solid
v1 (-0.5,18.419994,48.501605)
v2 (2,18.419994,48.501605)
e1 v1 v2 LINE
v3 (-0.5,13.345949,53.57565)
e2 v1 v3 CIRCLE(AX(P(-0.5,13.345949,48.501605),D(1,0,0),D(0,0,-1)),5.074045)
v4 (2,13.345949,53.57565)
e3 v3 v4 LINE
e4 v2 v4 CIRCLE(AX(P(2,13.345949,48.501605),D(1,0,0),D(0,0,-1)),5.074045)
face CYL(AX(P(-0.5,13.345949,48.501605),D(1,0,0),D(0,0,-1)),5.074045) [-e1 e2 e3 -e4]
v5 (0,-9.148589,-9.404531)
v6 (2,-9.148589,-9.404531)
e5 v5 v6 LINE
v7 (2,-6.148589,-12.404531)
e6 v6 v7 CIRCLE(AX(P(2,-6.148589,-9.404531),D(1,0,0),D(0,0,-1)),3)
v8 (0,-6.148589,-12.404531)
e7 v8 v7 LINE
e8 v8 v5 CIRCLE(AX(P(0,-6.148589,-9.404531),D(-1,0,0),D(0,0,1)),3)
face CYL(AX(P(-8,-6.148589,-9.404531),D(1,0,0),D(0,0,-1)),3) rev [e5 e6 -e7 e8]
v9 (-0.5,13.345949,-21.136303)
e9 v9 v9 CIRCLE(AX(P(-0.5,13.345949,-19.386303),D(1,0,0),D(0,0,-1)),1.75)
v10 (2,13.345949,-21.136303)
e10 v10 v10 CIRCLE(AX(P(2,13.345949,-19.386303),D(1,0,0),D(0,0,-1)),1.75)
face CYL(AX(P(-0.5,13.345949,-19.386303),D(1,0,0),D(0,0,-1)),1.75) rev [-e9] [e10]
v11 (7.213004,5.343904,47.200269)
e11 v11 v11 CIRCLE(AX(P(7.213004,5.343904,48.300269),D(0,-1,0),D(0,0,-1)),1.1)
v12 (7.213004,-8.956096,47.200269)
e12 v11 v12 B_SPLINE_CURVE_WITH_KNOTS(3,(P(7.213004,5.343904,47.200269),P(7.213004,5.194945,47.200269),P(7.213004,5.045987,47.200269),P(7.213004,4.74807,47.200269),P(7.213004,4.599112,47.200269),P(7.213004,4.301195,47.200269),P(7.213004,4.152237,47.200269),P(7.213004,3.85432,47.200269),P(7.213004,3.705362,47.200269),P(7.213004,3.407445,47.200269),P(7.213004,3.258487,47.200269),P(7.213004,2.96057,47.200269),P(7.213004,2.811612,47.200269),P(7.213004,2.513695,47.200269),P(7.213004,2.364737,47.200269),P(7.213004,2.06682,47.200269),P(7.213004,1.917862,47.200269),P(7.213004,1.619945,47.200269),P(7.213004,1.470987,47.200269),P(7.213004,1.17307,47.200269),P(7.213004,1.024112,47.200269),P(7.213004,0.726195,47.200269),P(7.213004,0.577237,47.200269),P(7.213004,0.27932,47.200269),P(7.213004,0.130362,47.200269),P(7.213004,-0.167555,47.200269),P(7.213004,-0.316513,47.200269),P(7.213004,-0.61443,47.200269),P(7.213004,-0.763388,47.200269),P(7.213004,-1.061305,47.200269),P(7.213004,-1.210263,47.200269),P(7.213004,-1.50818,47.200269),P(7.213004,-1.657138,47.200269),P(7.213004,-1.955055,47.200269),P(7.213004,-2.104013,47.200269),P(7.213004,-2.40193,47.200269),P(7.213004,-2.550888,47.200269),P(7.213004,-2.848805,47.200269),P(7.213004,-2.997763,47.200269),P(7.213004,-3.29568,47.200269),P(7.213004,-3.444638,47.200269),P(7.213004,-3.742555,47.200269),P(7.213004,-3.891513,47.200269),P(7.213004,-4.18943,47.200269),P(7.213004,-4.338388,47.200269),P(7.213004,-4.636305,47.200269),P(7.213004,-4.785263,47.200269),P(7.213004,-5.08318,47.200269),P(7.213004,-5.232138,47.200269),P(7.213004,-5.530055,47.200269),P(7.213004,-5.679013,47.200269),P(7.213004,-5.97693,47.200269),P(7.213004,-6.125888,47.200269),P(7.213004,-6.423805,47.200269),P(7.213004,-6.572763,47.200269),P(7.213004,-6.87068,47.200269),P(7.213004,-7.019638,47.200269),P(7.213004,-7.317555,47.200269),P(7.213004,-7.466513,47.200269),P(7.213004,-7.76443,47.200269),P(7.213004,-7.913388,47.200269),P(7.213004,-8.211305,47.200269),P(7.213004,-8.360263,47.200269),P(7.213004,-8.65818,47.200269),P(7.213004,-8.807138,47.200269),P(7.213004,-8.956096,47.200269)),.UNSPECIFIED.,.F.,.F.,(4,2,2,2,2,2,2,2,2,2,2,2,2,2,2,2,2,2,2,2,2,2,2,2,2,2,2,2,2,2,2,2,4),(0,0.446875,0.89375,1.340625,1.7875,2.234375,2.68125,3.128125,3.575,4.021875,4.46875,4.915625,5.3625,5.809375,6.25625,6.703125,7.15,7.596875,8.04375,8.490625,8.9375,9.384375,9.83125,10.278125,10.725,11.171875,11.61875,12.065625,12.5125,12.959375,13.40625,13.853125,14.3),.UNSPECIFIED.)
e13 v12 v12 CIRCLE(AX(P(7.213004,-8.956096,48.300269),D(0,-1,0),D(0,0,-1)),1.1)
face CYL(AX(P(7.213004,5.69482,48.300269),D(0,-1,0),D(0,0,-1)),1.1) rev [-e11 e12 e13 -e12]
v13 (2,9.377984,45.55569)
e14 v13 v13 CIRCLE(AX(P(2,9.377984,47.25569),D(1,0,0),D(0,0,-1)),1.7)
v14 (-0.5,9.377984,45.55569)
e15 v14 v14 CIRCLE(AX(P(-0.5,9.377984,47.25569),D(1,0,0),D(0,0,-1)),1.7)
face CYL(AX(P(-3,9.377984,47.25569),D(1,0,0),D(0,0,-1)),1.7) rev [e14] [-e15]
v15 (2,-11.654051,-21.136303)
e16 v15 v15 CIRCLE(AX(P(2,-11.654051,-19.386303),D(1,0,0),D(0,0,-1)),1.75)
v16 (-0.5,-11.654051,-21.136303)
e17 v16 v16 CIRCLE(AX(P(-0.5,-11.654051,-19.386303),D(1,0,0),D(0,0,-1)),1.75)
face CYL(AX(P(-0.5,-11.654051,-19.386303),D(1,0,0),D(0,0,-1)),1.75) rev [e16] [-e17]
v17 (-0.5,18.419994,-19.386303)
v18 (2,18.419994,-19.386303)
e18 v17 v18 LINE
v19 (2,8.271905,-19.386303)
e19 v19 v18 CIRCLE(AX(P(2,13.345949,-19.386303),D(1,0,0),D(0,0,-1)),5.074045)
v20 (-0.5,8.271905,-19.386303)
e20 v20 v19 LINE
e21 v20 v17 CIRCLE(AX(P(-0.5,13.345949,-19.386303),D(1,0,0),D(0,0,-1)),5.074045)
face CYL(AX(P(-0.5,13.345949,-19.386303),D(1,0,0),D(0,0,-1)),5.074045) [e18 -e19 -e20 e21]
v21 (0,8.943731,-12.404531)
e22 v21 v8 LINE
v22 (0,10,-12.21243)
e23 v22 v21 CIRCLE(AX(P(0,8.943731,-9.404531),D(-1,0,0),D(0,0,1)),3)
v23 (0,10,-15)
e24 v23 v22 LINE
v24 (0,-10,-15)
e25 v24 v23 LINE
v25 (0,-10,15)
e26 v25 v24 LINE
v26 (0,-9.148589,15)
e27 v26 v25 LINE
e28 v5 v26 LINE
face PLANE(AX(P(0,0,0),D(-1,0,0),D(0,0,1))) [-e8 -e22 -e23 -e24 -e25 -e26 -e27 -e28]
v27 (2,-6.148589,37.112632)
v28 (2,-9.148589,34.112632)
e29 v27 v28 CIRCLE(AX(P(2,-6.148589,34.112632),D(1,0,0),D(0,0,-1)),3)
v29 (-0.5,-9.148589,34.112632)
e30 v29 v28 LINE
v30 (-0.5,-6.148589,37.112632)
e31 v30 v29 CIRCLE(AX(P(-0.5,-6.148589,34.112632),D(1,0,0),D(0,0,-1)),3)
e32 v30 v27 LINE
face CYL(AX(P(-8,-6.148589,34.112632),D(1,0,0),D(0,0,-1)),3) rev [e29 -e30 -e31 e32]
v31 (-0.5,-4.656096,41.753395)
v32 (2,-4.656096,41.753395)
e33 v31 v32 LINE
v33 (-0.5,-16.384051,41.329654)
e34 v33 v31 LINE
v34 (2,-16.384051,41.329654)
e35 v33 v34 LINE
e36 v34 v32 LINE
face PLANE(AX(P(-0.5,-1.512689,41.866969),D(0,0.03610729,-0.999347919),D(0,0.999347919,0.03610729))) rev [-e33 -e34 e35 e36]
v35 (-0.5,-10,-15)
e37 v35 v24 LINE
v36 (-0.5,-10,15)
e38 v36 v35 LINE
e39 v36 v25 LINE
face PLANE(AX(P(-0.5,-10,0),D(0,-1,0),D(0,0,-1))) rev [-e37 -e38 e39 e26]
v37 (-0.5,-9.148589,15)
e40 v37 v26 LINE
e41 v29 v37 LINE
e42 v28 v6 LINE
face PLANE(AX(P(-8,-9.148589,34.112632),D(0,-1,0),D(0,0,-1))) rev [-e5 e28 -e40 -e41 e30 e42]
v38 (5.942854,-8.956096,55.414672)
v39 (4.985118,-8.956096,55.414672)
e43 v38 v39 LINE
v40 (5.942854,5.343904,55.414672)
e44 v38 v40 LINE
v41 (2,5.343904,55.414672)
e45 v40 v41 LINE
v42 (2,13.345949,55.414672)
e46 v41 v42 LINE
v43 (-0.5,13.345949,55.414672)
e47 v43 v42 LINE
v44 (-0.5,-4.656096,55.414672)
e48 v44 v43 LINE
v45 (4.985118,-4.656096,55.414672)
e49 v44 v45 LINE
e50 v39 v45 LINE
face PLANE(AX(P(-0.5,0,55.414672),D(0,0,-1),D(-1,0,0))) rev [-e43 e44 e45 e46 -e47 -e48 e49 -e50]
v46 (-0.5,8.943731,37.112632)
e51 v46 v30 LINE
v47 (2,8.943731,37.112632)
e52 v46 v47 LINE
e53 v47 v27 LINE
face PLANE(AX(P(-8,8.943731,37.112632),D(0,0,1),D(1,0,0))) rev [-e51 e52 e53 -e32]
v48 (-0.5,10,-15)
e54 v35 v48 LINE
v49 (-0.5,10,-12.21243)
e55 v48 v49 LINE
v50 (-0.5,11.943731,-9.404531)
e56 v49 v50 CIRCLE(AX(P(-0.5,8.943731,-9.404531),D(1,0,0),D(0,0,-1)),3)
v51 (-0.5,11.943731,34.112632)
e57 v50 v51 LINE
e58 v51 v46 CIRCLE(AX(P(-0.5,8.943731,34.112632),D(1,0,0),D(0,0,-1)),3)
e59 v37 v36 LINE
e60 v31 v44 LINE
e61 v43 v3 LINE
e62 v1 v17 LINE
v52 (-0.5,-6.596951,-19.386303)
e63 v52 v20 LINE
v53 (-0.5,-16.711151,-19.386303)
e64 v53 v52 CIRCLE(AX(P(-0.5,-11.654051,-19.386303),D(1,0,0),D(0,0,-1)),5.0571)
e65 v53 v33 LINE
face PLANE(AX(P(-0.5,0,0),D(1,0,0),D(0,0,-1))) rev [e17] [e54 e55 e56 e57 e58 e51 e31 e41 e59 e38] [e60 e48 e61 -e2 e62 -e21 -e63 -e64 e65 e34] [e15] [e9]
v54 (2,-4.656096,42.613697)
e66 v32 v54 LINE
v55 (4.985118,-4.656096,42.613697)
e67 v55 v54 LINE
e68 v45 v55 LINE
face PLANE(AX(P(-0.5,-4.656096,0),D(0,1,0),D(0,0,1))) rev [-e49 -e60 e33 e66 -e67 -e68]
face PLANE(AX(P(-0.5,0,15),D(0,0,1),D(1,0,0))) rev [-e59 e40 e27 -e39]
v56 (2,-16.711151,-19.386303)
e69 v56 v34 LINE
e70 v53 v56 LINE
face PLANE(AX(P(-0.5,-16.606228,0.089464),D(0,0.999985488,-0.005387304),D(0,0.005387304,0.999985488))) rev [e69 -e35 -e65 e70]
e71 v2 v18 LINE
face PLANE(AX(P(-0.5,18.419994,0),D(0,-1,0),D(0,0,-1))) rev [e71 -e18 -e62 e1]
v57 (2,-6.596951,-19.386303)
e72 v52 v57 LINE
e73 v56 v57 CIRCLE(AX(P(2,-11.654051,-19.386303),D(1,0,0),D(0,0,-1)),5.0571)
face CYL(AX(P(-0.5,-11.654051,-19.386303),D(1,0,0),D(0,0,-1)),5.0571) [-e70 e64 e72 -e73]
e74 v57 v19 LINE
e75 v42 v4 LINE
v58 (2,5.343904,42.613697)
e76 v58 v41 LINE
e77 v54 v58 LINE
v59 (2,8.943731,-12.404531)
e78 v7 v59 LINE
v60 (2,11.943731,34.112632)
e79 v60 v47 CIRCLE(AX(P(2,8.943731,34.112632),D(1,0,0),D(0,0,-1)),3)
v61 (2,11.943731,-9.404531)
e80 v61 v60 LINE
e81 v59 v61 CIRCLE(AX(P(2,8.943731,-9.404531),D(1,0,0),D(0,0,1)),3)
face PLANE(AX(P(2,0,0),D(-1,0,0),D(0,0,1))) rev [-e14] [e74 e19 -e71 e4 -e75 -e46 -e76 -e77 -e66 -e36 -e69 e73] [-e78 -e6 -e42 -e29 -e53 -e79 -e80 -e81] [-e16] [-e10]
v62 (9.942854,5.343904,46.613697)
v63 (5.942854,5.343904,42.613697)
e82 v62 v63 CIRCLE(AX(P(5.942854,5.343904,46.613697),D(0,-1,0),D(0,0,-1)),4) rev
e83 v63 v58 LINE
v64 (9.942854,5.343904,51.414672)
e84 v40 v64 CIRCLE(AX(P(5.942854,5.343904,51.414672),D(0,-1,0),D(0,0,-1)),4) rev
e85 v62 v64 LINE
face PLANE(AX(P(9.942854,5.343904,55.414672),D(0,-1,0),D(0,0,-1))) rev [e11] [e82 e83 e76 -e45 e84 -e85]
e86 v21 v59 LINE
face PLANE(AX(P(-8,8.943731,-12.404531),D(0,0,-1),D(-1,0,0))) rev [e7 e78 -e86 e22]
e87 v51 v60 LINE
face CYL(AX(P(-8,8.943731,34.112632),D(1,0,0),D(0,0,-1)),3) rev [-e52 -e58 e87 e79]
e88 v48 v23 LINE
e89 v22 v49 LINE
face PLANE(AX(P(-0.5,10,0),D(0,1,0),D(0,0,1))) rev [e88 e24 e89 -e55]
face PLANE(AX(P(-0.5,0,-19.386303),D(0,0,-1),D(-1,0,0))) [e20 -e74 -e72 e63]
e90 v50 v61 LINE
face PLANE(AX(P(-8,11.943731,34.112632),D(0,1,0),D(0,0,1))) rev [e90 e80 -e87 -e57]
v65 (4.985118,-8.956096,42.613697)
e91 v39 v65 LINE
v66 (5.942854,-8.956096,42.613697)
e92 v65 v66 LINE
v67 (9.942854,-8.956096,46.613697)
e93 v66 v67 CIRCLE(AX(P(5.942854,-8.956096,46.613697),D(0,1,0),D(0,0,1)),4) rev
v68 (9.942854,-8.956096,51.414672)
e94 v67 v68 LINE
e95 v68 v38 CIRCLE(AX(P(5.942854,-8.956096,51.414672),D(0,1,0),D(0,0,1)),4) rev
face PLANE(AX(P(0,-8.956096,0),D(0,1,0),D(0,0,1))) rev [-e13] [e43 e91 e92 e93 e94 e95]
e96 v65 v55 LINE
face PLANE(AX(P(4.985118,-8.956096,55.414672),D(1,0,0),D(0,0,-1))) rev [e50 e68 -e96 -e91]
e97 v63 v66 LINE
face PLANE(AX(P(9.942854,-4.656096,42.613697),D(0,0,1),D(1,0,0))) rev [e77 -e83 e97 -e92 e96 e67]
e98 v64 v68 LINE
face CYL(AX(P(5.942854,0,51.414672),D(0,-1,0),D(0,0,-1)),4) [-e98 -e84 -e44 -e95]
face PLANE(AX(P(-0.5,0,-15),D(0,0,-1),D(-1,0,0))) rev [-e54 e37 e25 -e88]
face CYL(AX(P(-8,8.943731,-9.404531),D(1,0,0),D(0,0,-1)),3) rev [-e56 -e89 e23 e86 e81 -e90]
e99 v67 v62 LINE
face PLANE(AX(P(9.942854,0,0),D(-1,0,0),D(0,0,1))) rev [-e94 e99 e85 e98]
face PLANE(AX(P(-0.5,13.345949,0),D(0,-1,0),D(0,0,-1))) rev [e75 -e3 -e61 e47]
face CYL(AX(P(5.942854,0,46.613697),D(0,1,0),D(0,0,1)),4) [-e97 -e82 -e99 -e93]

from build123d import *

# Parameters (mm, degrees)
SKETCH1_W           = 30
SKETCH1_H           = 20
BOSS_EXTRUDE1_DEPTH = 2
SKETCH2_W           = 30
SKETCH2_H           = 20
SKETCH2_R           = 1.75
BOSS_EXTRUDE2_DEPTH = 2.5
SKETCH5_W           = 12.800974789
SKETCH5_H           = 10
BOSS_EXTRUDE3_DEPTH = 7.942853576
SKETCH6_R           = 1.1
CUT_EXTRUDE3_DEPTH  = 10.350916352
CUT_EXTRUDE4_DEPTH  = 10
BOSS_EXTRUDE4_START = 4.3
SKETCH8_W           = 4.957735271
SKETCH8_H           = 12.800974789
SKETCH8_R           = 1.1
BOSS_EXTRUDE4_DEPTH = 4.3
FILLET2_R           = 4
SKETCH9_R           = 1.7
CUT_EXTRUDE5_DEPTH  = 5


with BuildPart() as part:
    # Sketch1 → Boss-Extrude1 (new body)
    with BuildSketch(Plane(origin=(0, 0, 0), x_dir=(0, 0, -1), z_dir=(1, 0, 0))):
        Rectangle(SKETCH1_W, SKETCH1_H)
    extrude(amount=BOSS_EXTRUDE1_DEPTH)

    # Sketch2 → Boss-Extrude2 (add)
    with BuildSketch(Plane(origin=(2, 0, 0), x_dir=(0, 0, -1), z_dir=(1, 0, 0))):
        with BuildLine():
            Line((19.386302525, -6.596950759), (19.386302525, 8.271904581))
            ThreePointArc((19.386302525, 8.271904581), (24.460347107, 13.345949163), (19.386302525, 18.419993745))
            Line((19.386302525, 18.419993745), (-48.501605412, 18.419993745))
            ThreePointArc((-48.501605412, 18.419993745), (-52.089496744, 16.933840495), (-53.575649994, 13.345949163))
            Line((-53.575649994, 13.345949163), (-55.414672264, 13.345949163))
            Line((-55.414672264, 13.345949163), (-55.414672264, -4.656096182))
            Line((-55.414672264, -4.656096182), (-41.753395036, -4.656096182))
            Line((-41.753395036, -4.656096182), (-41.329654068, -16.384050837))
            Line((-41.329654068, -16.384050837), (19.386302525, -16.711150914))
            ThreePointArc((19.386302525, -16.711150914), (24.443402602, -11.654050837), (19.386302525, -6.596950759))
        make_face()
        Rectangle(SKETCH2_W, SKETCH2_H, mode=Mode.SUBTRACT)
        with Locations((19.386302525, -11.654050837)):
            Circle(SKETCH2_R, mode=Mode.SUBTRACT)
        with Locations((19.386302525, 13.345949163)):
            Circle(SKETCH2_R, mode=Mode.SUBTRACT)
    extrude(amount=-BOSS_EXTRUDE2_DEPTH)

    # Sketch5 → Boss-Extrude3 (add)
    with BuildSketch(Plane(origin=(2, 0, 0), x_dir=(0, 0, -1), z_dir=(1, 0, 0))):
        with Locations((-49.014184869, 0.343903818)):
            Rectangle(SKETCH5_W, SKETCH5_H)
    extrude(amount=BOSS_EXTRUDE3_DEPTH)

    # Sketch6 → Cut-Extrude3 (cut)
    with BuildSketch(Plane(origin=(4.063003727, -4.656096182, -0.641169076), x_dir=(1, 0, 0), z_dir=(0, -1, 0))):
        with Locations((3.15, 48.941437628)):
            Circle(SKETCH6_R)
    extrude(amount=-CUT_EXTRUDE3_DEPTH, mode=Mode.SUBTRACT)

    # Sketch7 → Cut-Extrude4 (cut)
    with BuildSketch(Plane(origin=(2, 0, 0), x_dir=(0, 0, -1), z_dir=(1, 0, 0))):
        with BuildLine():
            Line((-34.112632424, 11.943731273), (9.404530778, 11.943731273))
            ThreePointArc((9.404530778, 11.943731273), (11.525851122, 11.065051617), (12.404530778, 8.943731273))
            Line((12.404530778, 8.943731273), (12.404530778, -6.148588701))
            ThreePointArc((12.404530778, -6.148588701), (11.525851122, -8.269909045), (9.404530778, -9.148588701))
            Line((9.404530778, -9.148588701), (-34.112632424, -9.148588701))
            ThreePointArc((-34.112632424, -9.148588701), (-36.233952768, -8.269909045), (-37.112632424, -6.148588701))
            Line((-37.112632424, -6.148588701), (-37.112632424, 8.943731273))
            ThreePointArc((-37.112632424, 8.943731273), (-36.233952768, 11.065051617), (-34.112632424, 11.943731273))
        make_face()
    extrude(amount=-CUT_EXTRUDE4_DEPTH, mode=Mode.SUBTRACT)

    # Sketch8 → Boss-Extrude4 (add)
    with BuildSketch(Plane.XZ.offset(4.656096182).offset(BOSS_EXTRUDE4_START)):
        with Locations((7.463985941, 49.014184869)):
            Rectangle(SKETCH8_W, SKETCH8_H)
        with Locations((7.213003727, 48.300268552)):
            Circle(SKETCH8_R, mode=Mode.SUBTRACT)
    extrude(amount=-BOSS_EXTRUDE4_DEPTH)

    # Fillet2
    fillet2_edges = [part.edges().sort_by_distance(p)[0] for p in [
        (9.942853576, -1.806096182, 42.613697475),
        (9.942853576, -1.806096182, 55.414672264),
    ]]
    fillet(fillet2_edges, radius=FILLET2_R)

    # Sketch9 → Cut-Extrude5 (cut)
    with BuildSketch(Plane(origin=(2, 0, 0), x_dir=(0, 0, -1), z_dir=(1, 0, 0))):
        with Locations((-47.255689875, 9.377983735)):
            Circle(SKETCH9_R)
    extrude(amount=-CUT_EXTRUDE5_DEPTH, mode=Mode.SUBTRACT)


solid = part.part
